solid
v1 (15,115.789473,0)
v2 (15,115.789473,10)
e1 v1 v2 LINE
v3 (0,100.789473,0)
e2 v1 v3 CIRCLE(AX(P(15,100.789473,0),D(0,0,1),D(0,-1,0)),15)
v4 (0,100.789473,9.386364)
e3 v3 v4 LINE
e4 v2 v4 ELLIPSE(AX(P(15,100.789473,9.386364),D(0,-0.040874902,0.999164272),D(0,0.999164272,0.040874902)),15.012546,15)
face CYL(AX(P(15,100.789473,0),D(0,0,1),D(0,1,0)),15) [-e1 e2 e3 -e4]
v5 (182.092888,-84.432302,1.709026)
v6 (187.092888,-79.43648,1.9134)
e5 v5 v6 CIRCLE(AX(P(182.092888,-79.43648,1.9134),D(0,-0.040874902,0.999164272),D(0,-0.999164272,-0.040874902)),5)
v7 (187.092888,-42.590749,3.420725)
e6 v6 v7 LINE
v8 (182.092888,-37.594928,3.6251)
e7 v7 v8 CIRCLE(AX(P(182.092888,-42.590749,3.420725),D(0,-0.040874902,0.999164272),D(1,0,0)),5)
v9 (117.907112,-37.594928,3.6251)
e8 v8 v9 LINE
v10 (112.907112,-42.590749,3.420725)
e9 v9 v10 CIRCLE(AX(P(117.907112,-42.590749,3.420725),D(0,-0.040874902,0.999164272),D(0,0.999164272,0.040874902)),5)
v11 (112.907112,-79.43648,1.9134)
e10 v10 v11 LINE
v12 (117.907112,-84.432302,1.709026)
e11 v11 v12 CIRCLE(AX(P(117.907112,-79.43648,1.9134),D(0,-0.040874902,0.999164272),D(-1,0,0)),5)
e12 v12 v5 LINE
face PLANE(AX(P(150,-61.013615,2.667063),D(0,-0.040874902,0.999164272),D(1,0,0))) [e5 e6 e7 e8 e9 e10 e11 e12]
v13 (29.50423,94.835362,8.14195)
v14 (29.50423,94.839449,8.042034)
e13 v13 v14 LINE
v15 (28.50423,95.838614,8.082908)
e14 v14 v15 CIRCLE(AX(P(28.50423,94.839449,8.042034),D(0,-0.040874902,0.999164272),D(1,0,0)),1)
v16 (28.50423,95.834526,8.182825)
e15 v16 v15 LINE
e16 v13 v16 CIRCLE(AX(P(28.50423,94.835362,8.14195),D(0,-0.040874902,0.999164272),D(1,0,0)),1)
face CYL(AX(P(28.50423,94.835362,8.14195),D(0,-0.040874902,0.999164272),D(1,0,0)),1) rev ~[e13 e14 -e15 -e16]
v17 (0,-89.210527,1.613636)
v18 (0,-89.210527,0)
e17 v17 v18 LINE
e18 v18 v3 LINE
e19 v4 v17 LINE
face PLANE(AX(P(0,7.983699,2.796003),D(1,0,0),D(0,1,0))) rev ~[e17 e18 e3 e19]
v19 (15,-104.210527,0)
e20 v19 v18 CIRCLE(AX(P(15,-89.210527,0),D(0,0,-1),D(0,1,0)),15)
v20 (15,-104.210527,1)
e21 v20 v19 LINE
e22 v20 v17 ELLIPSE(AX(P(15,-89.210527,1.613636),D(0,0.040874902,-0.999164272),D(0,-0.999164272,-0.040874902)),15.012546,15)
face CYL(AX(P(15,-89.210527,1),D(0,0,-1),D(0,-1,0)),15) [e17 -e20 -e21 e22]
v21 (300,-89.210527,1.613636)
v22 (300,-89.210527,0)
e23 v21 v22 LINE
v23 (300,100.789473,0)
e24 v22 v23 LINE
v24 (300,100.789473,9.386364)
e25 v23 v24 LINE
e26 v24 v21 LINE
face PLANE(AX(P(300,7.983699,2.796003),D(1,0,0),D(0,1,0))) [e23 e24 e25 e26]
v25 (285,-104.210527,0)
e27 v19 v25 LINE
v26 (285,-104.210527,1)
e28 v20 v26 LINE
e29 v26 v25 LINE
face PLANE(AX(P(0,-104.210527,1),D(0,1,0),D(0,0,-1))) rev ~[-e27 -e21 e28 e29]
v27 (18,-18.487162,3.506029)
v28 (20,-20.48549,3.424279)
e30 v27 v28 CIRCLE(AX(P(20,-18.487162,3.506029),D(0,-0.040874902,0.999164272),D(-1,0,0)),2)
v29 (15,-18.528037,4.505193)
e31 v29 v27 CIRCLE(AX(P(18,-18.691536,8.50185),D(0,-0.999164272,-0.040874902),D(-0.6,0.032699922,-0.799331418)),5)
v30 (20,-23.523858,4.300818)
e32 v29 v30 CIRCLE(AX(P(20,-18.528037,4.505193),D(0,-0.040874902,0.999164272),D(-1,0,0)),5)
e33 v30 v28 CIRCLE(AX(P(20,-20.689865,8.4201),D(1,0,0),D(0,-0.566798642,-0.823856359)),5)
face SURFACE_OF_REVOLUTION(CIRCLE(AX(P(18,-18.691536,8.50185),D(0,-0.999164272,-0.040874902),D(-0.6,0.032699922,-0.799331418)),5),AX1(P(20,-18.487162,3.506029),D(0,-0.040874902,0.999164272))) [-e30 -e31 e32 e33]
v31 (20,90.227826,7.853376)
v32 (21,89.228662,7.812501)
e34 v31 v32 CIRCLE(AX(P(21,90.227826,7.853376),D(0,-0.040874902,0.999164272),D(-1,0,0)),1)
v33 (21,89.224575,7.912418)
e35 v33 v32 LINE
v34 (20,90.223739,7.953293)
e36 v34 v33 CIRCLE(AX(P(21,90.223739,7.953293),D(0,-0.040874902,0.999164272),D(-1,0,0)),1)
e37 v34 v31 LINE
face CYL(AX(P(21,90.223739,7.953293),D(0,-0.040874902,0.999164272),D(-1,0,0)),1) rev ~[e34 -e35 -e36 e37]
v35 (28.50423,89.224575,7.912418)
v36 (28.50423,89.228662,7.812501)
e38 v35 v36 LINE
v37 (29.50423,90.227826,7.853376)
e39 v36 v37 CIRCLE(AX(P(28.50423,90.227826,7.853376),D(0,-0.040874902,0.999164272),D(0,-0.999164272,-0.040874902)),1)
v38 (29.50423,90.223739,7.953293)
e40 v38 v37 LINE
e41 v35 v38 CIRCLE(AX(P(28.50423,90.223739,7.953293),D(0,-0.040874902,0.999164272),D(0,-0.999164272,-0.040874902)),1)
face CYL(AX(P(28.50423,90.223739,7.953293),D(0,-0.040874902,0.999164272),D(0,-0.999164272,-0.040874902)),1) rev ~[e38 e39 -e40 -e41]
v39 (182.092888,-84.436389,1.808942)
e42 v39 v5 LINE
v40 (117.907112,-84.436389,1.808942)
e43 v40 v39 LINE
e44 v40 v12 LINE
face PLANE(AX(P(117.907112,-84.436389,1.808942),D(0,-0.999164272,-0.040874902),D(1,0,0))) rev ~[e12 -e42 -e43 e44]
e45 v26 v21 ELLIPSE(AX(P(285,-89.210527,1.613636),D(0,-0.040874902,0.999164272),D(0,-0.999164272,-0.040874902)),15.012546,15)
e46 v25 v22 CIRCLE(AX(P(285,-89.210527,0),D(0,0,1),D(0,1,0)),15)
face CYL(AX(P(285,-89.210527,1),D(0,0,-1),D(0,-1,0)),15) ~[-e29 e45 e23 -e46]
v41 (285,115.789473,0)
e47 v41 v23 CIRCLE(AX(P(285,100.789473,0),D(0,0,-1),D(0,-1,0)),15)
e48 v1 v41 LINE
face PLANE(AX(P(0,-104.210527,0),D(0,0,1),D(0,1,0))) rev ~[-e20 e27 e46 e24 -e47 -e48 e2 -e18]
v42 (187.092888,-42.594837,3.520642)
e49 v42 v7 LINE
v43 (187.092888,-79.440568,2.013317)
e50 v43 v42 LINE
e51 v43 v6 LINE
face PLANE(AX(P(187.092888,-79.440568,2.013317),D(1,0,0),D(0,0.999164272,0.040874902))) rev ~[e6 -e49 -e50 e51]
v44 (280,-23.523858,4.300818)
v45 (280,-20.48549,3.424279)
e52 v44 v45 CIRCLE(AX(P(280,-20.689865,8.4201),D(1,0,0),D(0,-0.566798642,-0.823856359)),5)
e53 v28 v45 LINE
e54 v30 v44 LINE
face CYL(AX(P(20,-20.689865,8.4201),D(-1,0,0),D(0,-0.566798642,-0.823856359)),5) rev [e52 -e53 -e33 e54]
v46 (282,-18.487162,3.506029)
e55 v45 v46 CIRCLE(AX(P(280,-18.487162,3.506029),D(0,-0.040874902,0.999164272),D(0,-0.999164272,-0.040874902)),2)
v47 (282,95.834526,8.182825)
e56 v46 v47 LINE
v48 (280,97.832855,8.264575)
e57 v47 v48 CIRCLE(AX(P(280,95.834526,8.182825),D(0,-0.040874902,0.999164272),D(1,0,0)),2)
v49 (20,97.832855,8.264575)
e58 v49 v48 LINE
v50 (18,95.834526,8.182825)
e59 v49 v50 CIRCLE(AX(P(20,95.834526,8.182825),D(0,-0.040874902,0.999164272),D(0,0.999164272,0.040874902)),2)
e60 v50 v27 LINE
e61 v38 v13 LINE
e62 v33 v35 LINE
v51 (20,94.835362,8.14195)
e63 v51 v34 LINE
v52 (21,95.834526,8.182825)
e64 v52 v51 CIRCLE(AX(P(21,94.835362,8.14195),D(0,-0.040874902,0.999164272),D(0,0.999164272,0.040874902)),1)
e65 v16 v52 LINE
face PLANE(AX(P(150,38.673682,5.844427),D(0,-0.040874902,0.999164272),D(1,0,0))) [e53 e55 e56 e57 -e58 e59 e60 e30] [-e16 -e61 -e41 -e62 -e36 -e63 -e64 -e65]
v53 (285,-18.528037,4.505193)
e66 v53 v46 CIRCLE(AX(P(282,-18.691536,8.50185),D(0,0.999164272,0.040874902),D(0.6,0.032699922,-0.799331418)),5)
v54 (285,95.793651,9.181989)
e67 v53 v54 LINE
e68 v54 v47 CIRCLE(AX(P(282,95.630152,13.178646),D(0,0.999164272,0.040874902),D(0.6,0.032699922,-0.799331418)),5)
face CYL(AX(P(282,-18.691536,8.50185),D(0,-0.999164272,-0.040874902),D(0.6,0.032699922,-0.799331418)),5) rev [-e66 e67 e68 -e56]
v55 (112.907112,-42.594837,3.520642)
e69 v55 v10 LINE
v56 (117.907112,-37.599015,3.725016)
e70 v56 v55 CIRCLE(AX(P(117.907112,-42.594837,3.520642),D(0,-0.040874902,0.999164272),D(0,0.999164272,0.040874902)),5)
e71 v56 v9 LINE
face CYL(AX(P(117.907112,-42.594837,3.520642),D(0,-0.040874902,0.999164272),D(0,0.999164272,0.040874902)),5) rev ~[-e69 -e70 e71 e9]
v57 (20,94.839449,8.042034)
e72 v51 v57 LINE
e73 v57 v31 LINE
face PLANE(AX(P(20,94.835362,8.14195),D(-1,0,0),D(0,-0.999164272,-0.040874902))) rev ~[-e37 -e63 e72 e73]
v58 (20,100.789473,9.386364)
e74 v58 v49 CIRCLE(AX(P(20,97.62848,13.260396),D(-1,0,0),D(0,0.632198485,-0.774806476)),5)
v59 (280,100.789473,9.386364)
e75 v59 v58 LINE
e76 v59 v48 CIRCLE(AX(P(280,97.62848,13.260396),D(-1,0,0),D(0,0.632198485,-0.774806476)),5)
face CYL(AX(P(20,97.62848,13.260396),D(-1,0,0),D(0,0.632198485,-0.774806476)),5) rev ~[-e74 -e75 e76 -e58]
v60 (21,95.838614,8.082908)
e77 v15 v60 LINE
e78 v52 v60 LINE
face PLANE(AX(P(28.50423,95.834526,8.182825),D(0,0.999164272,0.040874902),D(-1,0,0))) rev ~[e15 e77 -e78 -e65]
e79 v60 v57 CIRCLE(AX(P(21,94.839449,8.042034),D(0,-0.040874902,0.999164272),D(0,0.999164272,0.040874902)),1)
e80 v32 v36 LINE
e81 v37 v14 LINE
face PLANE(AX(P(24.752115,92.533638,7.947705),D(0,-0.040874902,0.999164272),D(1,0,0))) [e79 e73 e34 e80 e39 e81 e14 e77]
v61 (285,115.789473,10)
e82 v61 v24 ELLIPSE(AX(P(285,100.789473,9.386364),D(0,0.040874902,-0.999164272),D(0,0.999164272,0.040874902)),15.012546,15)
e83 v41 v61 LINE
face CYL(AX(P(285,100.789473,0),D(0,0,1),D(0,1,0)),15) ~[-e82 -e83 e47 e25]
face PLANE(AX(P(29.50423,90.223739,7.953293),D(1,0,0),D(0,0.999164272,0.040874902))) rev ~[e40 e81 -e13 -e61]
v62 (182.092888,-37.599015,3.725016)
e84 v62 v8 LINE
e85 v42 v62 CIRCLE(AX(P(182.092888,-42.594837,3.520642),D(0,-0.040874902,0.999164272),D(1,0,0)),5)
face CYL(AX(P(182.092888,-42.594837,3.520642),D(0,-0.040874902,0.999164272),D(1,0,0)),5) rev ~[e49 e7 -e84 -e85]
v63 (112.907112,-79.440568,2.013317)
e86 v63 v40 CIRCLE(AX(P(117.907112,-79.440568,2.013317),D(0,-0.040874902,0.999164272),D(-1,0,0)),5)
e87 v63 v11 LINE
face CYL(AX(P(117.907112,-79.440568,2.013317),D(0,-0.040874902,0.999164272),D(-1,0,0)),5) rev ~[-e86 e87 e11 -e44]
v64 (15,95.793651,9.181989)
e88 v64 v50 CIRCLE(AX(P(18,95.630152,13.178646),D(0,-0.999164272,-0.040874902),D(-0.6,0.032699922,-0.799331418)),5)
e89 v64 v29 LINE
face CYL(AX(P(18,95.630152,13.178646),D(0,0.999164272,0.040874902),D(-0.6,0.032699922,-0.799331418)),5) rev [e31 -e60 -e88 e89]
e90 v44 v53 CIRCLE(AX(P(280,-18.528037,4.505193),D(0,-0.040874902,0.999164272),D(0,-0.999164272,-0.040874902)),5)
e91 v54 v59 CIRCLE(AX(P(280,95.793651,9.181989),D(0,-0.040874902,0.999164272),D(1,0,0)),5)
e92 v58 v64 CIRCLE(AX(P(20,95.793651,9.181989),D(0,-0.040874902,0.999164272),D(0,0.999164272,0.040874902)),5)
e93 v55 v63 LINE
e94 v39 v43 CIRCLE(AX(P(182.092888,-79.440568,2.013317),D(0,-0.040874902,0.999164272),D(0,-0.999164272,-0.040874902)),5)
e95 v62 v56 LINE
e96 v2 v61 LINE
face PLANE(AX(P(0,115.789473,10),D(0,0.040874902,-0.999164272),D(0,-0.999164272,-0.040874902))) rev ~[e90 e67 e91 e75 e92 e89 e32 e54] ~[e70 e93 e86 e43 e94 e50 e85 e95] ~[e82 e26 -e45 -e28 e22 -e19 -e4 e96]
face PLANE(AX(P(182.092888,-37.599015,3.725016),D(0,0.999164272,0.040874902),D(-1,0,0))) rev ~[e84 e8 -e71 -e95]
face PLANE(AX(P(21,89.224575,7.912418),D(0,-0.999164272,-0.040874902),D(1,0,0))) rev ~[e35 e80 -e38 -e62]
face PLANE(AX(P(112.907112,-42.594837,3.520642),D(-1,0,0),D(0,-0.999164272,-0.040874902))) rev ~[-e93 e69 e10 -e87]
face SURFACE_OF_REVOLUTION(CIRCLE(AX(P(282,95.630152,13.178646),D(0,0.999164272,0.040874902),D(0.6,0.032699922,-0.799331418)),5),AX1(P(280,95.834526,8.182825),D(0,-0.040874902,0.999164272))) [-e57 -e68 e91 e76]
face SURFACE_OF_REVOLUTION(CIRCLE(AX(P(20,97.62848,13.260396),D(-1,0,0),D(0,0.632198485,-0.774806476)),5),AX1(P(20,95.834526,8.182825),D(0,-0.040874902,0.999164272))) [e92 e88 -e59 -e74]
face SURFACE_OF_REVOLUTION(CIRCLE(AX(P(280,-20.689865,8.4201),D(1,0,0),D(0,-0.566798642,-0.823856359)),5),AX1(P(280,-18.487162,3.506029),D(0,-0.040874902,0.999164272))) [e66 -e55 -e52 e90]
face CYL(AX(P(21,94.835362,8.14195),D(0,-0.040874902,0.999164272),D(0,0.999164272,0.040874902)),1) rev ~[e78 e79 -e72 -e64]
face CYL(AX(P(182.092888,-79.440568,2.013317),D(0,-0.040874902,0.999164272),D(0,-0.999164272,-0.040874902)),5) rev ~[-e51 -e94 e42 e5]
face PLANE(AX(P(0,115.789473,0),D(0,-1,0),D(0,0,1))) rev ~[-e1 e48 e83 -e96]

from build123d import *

# Parameters (mm, degrees)
F1_DEPTH     = 300
F2_R         = 15
F4_DEPTH     = 1
F5_T1_DEPTH  = 260
F5_T3_DEPTH  = 114.4173096389
F5_T5_DEPTH  = 114.4173096389
F5_T8_ANGLE  = 90
F5_T10_ANGLE = 90
F5_T12_ANGLE = 90
F5_T14_ANGLE = 90
F7_DEPTH     = 0.1
F9_DEPTH     = 0.1


# Not quite as in the source:
# - a fillet or chamfer that OpenCascade refuses, or shapes differently, is made with other operations: its cross-section is extruded or revolved along the edge and cut away or added


with BuildPart() as f1:
    # F0 (on Right) → F1 (new body)
    with BuildSketch(Plane.YZ):
        Polygon((-104.210527479, 1), (-104.210527479, 0), (115.789472521, 0), (115.789472521, 10), align=None)
    extrude(amount=F1_DEPTH)

    # F2
    f2_edges = [f1.edges().sort_by_distance(p)[0] for p in [
        (300, 115.789473, 5),
        (0, 115.789473, 5),
        (0, -104.210527, 0.5),
        (300, -104.210527, 0.5),
    ]]
    fillet(f2_edges, radius=F2_R)

    # F3 (on face) → F4 (cut)
    with BuildSketch(Plane(origin=(0, -0.2149512742, 5.2543644811), x_dir=(1, 0, 0), z_dir=(0, -0.040874902, 0.999164272))):
        with BuildLine():
            Line((280, 101.0889066279), (20, 101.0889066279))
            ThreePointArc((20, 101.0889066279), (16.4644660941, 99.6244405339), (15, 96.0889066279))
            Line((15, 96.0889066279), (15, -18.328403011))
            ThreePointArc((15, -18.328403011), (16.4644660941, -21.8639369169), (20, -23.328403011))
            Line((20, -23.328403011), (280, -23.328403011))
            ThreePointArc((280, -23.328403011), (283.5355339059, -21.8639369169), (285, -18.328403011))
            Line((285, -18.328403011), (285, 96.0889066279))
            ThreePointArc((285, 96.0889066279), (283.5355339059, 99.6244405339), (280, 101.0889066279))
        make_face()
    extrude(amount=-F4_DEPTH, mode=Mode.SUBTRACT)

    # F5: fillet of radius 5 on 8 edges, made by hand

    # F5_s2 → F5_t1 (join)
    with BuildSketch(Plane.YZ.offset(20)):
        with BuildLine():
            ThreePointArc((100.789472521, 9.3863636364), (99.4021842094, 8.5855726288), (97.8328546072, 8.2645746583))
            Line((97.8328546072, 8.2645746583), (100.8303474231, 8.3871993644))
            Line((100.8303474231, 8.3871993644), (100.789472521, 9.3863636364))
        make_face()
        with BuildLine():
            ThreePointArc((-23.5238580849, 4.3008182934), (-22.0757956208, 3.6160189085), (-20.485490367, 3.4242787275))
            Line((-20.485490367, 3.4242787275), (-23.4829831829, 3.3016540214))
            Line((-23.4829831829, 3.3016540214), (-23.5238580849, 4.3008182934))
        make_face()
    extrude(amount=F5_T1_DEPTH)

    # F5_s4 → F5_t3 (join)
    with BuildSketch(Plane(origin=(0, 96.0086024354, 3.9276246451), x_dir=(1, 0, 0), z_dir=(0, -0.999164272, -0.040874902))):
        with BuildLine():
            ThreePointArc((15, 5.2587593737), (16.4188611699, 4.5153428835), (18, 4.2587593737))
            Line((18, 4.2587593737), (15, 4.2587593737))
            Line((15, 4.2587593737), (15, 5.2587593737))
        make_face()
    extrude(amount=F5_T3_DEPTH)

    # F5_s6 → F5_t5 (join)
    with BuildSketch(Plane(origin=(0, -18.3130854508, -0.7491716775), x_dir=(1, 0, 0), z_dir=(0, 0.999164272, 0.040874902))):
        with BuildLine():
            ThreePointArc((285, -5.2587593737), (283.5811388301, -4.5153428835), (282, -4.2587593737))
            Line((282, -4.2587593737), (285, -4.2587593737))
            Line((285, -4.2587593737), (285, -5.2587593737))
        make_face()
    extrude(amount=F5_T5_DEPTH)

    # F5_s7 → F5_t8 (revolve)
    with BuildSketch(Plane.YZ.offset(20)):
        with BuildLine():
            ThreePointArc((100.789472521, 9.3863636364), (99.4021842094, 8.5855726288), (97.8328546072, 8.2645746583))
            Line((97.8328546072, 8.2645746583), (100.8303474231, 8.3871993644))
            Line((100.8303474231, 8.3871993644), (100.789472521, 9.3863636364))
        make_face()
    revolve(axis=Axis((20, 95.8345260632, 8.1828248542), (0, -0.040874902, 0.999164272)), revolution_arc=F5_T8_ANGLE)

    # F5_s9 → F5_t10 (revolve)
    with BuildSketch(Plane(origin=(0, -18.3130854508, -0.7491716775), x_dir=(1, 0, 0), z_dir=(0, 0.999164272, 0.040874902))):
        with BuildLine():
            ThreePointArc((15, -5.2587593737), (16.4188611699, -4.5153428835), (18, -4.2587593737))
            Line((18, -4.2587593737), (15, -4.2587593737))
            Line((15, -4.2587593737), (15, -5.2587593737))
        make_face()
    revolve(axis=Axis((20, -18.487161823, 3.5060285316), (0, -0.040874902, 0.999164272)), revolution_arc=F5_T10_ANGLE)

    # F5_s11 → F5_t12 (revolve)
    with BuildSketch(Plane.YZ.offset(280)):
        with BuildLine():
            ThreePointArc((-23.5238580849, 4.3008182934), (-22.0757956208, 3.6160189085), (-20.485490367, 3.4242787275))
            Line((-20.485490367, 3.4242787275), (-23.4829831829, 3.3016540214))
            Line((-23.4829831829, 3.3016540214), (-23.5238580849, 4.3008182934))
        make_face()
    revolve(axis=Axis((280, -18.487161823, 3.5060285316), (0, -0.040874902, 0.999164272)), revolution_arc=F5_T12_ANGLE)

    # F5_s13 → F5_t14 (revolve)
    with BuildSketch(Plane(origin=(0, 96.0086024354, 3.9276246451), x_dir=(1, 0, 0), z_dir=(0, -0.999164272, -0.040874902))):
        with BuildLine():
            ThreePointArc((285, 5.2587593737), (283.5811388301, 4.5153428835), (282, 4.2587593737))
            Line((282, 4.2587593737), (285, 4.2587593737))
            Line((285, 4.2587593737), (285, 5.2587593737))
        make_face()
    revolve(axis=Axis((280, 95.8345260632, 8.1828248542), (0, -0.040874902, 0.999164272)), revolution_arc=F5_T14_ANGLE)

    # F6 (on face) → F7 (cut)
    with BuildSketch(Plane(origin=(0, -0.2149512742, 5.2543644811), x_dir=(1, 0, 0), z_dir=(0, -0.040874902, 0.999164272))):
        with BuildLine():
            Line((182.0928883553, -37.4153330922), (117.9071116447, -37.4153330922))
            ThreePointArc((117.9071116447, -37.4153330922), (114.3715777388, -38.8797991863), (112.9071116447, -42.4153330922))
            Line((112.9071116447, -42.4153330922), (112.9071116447, -79.291882813))
            ThreePointArc((112.9071116447, -79.291882813), (114.3715777388, -82.8274167189), (117.9071116447, -84.291882813))
            Line((117.9071116447, -84.291882813), (182.0928883553, -84.291882813))
            ThreePointArc((182.0928883553, -84.291882813), (185.6284222612, -82.8274167189), (187.0928883553, -79.291882813))
            Line((187.0928883553, -79.291882813), (187.0928883553, -42.4153330922))
            ThreePointArc((187.0928883553, -42.4153330922), (185.6284222612, -38.8797991863), (182.0928883553, -37.4153330922))
        make_face()
    extrude(amount=-F7_DEPTH, mode=Mode.SUBTRACT)

    # F8 (on face) → F9 (cut)
    with BuildSketch(Plane(origin=(0, -0.1740763722, 4.2552002091), x_dir=(1, 0, 0), z_dir=(0, -0.040874902, 0.999164272))):
        with BuildLine():
            Line((28.5042302459, 96.0889066279), (21, 96.0889066279))
            ThreePointArc((21, 96.0889066279), (20.2928932188, 95.7960134091), (20, 95.0889066279))
            Line((20, 95.0889066279), (20, 90.473426342))
            ThreePointArc((20, 90.473426342), (20.2928932188, 89.7663195608), (21, 89.473426342))
            Line((21, 89.473426342), (28.5042302459, 89.473426342))
            ThreePointArc((28.5042302459, 89.473426342), (29.2113370271, 89.7663195608), (29.5042302459, 90.473426342))
            Line((29.5042302459, 90.473426342), (29.5042302459, 95.0889066279))
            ThreePointArc((29.5042302459, 95.0889066279), (29.2113370271, 95.7960134091), (28.5042302459, 96.0889066279))
        make_face()
    extrude(amount=-F9_DEPTH, mode=Mode.SUBTRACT)


solid = f1.part
